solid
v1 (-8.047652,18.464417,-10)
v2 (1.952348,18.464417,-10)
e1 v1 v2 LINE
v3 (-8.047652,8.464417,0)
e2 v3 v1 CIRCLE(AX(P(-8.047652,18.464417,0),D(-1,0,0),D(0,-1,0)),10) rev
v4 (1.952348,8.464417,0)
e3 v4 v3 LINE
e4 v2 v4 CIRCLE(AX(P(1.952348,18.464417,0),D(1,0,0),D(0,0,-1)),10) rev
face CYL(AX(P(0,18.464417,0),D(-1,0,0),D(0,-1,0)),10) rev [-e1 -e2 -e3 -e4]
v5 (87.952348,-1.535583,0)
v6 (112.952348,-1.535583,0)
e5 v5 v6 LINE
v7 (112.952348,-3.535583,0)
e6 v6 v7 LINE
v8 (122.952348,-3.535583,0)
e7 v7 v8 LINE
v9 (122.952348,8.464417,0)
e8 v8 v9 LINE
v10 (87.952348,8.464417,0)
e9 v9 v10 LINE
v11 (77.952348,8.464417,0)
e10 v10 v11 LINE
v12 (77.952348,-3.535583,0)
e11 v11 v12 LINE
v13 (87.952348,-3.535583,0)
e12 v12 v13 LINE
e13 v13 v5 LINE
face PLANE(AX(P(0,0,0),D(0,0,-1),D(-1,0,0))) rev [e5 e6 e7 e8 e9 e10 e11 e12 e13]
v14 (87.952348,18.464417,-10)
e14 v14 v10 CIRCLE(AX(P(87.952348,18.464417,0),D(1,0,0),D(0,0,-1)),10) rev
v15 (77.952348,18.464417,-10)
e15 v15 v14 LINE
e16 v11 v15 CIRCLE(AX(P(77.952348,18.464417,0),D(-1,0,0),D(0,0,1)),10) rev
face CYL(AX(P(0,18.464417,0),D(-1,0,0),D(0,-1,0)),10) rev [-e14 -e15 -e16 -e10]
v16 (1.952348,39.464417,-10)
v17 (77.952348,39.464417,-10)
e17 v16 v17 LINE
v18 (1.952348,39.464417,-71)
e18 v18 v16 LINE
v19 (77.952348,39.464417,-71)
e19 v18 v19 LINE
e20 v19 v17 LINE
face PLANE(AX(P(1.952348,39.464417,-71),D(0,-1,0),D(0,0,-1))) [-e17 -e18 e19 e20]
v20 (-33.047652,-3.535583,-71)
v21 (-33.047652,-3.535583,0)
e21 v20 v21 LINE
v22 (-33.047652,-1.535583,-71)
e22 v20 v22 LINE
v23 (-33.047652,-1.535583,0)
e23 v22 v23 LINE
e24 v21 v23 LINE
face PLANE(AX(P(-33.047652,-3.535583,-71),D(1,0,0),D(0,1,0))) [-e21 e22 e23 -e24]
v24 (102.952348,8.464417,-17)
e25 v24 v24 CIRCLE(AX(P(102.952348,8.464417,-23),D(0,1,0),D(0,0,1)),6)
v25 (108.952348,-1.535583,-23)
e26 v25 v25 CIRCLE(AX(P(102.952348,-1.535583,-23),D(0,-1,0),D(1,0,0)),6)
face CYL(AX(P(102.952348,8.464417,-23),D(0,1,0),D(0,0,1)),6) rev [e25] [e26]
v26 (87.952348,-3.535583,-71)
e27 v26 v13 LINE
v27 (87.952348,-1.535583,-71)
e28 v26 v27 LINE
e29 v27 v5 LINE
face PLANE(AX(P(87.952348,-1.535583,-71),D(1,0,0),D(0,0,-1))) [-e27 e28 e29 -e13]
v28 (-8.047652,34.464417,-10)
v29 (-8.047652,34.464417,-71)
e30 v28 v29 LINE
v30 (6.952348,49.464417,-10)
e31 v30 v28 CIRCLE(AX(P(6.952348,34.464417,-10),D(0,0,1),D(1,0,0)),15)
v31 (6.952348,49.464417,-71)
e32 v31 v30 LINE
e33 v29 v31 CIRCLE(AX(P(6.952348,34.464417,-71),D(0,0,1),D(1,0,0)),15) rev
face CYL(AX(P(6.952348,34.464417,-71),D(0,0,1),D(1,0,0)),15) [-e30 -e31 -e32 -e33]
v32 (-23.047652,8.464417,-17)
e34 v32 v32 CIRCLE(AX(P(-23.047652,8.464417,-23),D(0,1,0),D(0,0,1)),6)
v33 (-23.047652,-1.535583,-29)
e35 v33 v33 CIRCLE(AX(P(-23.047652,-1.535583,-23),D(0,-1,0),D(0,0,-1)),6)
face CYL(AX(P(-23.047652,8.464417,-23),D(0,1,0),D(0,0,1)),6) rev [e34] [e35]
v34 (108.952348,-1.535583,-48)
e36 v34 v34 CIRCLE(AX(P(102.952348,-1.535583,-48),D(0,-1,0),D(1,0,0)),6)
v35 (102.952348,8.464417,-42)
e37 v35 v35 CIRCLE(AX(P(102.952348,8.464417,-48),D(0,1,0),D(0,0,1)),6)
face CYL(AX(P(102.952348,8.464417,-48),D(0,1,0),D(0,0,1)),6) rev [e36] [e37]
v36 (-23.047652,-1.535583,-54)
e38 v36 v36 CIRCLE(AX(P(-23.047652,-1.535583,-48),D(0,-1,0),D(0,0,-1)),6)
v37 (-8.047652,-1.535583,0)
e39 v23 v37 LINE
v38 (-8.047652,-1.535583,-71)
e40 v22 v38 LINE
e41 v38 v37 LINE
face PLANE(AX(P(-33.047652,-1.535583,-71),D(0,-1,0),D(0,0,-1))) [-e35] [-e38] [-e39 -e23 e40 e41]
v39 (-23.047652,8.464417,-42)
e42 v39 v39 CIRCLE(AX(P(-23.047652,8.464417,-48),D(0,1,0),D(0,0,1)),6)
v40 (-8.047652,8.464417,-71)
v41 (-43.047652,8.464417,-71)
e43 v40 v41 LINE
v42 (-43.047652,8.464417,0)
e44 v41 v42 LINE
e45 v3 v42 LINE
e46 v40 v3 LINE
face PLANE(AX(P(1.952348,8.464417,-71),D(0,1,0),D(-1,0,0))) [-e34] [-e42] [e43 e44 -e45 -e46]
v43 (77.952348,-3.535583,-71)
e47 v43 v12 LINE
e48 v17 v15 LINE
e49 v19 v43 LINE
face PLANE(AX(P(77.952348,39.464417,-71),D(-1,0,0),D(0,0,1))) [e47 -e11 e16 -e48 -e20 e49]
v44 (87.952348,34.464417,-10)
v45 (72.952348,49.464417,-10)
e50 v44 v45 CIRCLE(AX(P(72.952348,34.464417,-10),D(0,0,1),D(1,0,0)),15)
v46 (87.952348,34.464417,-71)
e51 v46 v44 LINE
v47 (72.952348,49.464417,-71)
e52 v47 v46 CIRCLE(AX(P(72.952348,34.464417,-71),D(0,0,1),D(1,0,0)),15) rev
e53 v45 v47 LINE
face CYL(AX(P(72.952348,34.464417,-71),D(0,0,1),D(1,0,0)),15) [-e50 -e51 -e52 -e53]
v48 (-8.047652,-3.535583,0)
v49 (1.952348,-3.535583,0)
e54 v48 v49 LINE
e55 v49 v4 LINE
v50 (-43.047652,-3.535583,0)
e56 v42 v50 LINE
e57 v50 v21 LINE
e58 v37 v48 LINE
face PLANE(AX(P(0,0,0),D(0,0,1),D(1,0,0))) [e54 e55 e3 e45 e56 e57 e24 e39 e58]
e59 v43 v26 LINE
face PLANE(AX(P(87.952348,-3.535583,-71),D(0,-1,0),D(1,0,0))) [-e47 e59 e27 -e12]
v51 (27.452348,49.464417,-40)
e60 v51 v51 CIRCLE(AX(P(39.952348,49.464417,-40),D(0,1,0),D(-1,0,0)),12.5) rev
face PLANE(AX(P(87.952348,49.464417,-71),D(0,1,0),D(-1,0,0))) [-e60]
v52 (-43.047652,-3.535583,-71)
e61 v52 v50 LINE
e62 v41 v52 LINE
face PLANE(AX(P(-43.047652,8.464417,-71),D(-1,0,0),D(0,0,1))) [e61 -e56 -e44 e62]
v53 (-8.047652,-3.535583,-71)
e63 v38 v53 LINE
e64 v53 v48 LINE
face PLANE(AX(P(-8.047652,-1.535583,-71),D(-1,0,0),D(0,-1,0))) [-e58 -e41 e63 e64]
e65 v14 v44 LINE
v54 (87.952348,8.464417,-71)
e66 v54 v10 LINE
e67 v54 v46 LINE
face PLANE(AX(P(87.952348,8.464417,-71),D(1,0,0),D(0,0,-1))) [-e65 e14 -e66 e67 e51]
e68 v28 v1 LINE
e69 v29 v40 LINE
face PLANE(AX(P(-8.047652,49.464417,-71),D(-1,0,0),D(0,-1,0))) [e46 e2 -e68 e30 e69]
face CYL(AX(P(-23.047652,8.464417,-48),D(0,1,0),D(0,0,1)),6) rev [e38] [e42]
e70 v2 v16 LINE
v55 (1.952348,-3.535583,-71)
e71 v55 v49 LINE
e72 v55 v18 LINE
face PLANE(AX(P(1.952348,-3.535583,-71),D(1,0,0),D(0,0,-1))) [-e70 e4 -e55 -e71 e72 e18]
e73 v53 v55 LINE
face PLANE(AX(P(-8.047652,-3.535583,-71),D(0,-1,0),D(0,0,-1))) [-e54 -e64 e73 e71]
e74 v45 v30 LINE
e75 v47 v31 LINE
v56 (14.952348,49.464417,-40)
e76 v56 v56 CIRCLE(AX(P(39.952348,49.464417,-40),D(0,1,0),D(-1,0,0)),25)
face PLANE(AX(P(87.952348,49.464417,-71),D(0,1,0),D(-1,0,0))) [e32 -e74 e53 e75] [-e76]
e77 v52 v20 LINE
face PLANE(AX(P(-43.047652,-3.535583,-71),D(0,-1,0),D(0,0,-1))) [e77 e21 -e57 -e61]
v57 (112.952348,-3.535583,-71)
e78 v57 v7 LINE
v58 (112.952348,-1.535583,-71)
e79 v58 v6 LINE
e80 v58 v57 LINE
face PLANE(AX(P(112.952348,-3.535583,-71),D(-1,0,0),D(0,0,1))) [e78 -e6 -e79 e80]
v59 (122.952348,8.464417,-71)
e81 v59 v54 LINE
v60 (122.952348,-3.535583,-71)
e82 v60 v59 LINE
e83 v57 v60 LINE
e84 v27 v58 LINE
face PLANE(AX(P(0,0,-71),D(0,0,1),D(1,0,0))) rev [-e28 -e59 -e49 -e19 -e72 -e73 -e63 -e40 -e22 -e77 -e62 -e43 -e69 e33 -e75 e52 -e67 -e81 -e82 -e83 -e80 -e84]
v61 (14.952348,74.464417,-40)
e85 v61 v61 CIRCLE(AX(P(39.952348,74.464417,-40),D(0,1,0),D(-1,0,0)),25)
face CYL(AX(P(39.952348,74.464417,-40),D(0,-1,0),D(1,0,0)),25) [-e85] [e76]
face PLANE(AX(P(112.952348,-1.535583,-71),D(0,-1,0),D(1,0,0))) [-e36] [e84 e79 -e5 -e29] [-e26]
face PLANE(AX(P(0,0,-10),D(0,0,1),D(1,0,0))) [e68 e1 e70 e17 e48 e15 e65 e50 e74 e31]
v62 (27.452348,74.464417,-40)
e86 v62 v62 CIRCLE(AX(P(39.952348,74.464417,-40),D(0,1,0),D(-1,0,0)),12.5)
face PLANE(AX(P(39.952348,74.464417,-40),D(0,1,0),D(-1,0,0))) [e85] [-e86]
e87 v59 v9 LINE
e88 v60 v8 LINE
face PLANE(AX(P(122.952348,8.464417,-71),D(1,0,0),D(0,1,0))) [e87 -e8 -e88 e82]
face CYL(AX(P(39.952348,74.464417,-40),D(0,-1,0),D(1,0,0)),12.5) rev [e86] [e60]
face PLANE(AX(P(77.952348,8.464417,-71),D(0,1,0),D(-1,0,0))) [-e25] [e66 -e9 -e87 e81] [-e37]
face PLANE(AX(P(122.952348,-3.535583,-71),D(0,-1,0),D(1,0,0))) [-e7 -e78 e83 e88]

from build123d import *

# Parameters (mm, degrees)
BOSS_EXTRUDE1_DEPTH    = 71
BOSS_EXTRUDE1_2_DEPTH  = 71
BOSS_EXTRUDE3_DEPTH    = 61
FILLET2_R              = 10
FILLET3_R              = 15
SKETCH6_R              = 25
SKETCH6_R_2            = 12.5
BOSS_EXTRUDE4_DEPTH    = 25
F_12_0MM_DOWEL_SLOT1_D = 12
F_12_0MM_DOWEL_SLOT2_D = 12


with BuildPart() as part:
    # Sketch2 → Boss-Extrude1 (new body)
    with BuildSketch(Plane.XY):
        Polygon((-43.047651623, -3.53558301), (-33.047651623, -3.53558301), (-33.047651623, -1.53558301), (-8.047651623, -1.53558301), (-8.047651623, -3.53558301), (1.952348377, -3.53558301), (1.952348377, 8.46441699), (-43.047651623, 8.46441699), align=None)
    extrude(amount=-BOSS_EXTRUDE1_DEPTH)



with BuildPart() as body_2:
    # Sketch2 → Boss-Extrude1 2 (new body)
    with BuildSketch(Plane.XY):
        Polygon((77.952348377, -3.53558301), (77.952348377, 8.46441699), (122.952348377, 8.46441699), (122.952348377, -3.53558301), (112.952348377, -3.53558301), (112.952348377, -1.53558301), (87.952348377, -1.53558301), (87.952348377, -3.53558301), align=None)
    extrude(amount=-BOSS_EXTRUDE1_2_DEPTH)


with BuildPart() as part_1:
    add(part.part)

    add(body_2.part)  # Boss-Extrude3 merges body 2
    # Sketch5 → Boss-Extrude3 (add)
    with BuildSketch(Plane.XY.offset(-10)):
        Polygon((1.952348377, 8.46441699), (1.952348377, 39.46441699), (77.952348377, 39.46441699), (77.952348377, 8.46441699), (87.952348377, 8.46441699), (87.952348377, 49.46441699), (-8.047651623, 49.46441699), (-8.047651623, 8.46441699), align=None)
    extrude(amount=-BOSS_EXTRUDE3_DEPTH)

    # Fillet2
    fillet2_edges = [part_1.edges().sort_by_distance(p)[0] for p in [
        (82.952348377, 8.46441699, -10),
        (-3.047651623, 8.46441699, -10),
    ]]
    fillet(fillet2_edges, radius=FILLET2_R - 0.0001)  # a hair under: the kernel refuses the full size

    # Fillet3
    fillet3_edges = [part_1.edges().sort_by_distance(p)[0] for p in [
        (-8.047651623, 49.46441699, -40.5),
        (87.952348377, 49.46441699, -40.5),
    ]]
    fillet(fillet3_edges, radius=FILLET3_R)

    # Sketch6 → Boss-Extrude4 (add)
    with BuildSketch(Plane(origin=(0, 49.46441699, 0), x_dir=(1, 0, 0), z_dir=(0, 1, 0))):
        with Locations(Location((39.952348377, 40, 0), (0, 0, 180))):
            Circle(SKETCH6_R)
        with Locations(Location((39.952348377, 40, 0), (0, 0, 180))):
            Circle(SKETCH6_R_2, mode=Mode.SUBTRACT)
    extrude(amount=BOSS_EXTRUDE4_DEPTH)

    # Ø12.0mm Dowel Slot1 (through all)
    with Locations(Plane(origin=(0, 8.46441699, 0), x_dir=(1, 0, 0), z_dir=(0, 1, 0))):
        with Locations((102.952348377, 48), (102.952348377, 23)):
            Hole(F_12_0MM_DOWEL_SLOT1_D / 2)

    # Ø12.0mm Dowel Slot2 (through all)
    with Locations(Plane(origin=(0, 8.46441699, 0), x_dir=(1, 0, 0), z_dir=(0, 1, 0))):
        with Locations((-23.047651623, 23), (-23.047651623, 48)):
            Hole(F_12_0MM_DOWEL_SLOT2_D / 2)


solid = part_1.part
